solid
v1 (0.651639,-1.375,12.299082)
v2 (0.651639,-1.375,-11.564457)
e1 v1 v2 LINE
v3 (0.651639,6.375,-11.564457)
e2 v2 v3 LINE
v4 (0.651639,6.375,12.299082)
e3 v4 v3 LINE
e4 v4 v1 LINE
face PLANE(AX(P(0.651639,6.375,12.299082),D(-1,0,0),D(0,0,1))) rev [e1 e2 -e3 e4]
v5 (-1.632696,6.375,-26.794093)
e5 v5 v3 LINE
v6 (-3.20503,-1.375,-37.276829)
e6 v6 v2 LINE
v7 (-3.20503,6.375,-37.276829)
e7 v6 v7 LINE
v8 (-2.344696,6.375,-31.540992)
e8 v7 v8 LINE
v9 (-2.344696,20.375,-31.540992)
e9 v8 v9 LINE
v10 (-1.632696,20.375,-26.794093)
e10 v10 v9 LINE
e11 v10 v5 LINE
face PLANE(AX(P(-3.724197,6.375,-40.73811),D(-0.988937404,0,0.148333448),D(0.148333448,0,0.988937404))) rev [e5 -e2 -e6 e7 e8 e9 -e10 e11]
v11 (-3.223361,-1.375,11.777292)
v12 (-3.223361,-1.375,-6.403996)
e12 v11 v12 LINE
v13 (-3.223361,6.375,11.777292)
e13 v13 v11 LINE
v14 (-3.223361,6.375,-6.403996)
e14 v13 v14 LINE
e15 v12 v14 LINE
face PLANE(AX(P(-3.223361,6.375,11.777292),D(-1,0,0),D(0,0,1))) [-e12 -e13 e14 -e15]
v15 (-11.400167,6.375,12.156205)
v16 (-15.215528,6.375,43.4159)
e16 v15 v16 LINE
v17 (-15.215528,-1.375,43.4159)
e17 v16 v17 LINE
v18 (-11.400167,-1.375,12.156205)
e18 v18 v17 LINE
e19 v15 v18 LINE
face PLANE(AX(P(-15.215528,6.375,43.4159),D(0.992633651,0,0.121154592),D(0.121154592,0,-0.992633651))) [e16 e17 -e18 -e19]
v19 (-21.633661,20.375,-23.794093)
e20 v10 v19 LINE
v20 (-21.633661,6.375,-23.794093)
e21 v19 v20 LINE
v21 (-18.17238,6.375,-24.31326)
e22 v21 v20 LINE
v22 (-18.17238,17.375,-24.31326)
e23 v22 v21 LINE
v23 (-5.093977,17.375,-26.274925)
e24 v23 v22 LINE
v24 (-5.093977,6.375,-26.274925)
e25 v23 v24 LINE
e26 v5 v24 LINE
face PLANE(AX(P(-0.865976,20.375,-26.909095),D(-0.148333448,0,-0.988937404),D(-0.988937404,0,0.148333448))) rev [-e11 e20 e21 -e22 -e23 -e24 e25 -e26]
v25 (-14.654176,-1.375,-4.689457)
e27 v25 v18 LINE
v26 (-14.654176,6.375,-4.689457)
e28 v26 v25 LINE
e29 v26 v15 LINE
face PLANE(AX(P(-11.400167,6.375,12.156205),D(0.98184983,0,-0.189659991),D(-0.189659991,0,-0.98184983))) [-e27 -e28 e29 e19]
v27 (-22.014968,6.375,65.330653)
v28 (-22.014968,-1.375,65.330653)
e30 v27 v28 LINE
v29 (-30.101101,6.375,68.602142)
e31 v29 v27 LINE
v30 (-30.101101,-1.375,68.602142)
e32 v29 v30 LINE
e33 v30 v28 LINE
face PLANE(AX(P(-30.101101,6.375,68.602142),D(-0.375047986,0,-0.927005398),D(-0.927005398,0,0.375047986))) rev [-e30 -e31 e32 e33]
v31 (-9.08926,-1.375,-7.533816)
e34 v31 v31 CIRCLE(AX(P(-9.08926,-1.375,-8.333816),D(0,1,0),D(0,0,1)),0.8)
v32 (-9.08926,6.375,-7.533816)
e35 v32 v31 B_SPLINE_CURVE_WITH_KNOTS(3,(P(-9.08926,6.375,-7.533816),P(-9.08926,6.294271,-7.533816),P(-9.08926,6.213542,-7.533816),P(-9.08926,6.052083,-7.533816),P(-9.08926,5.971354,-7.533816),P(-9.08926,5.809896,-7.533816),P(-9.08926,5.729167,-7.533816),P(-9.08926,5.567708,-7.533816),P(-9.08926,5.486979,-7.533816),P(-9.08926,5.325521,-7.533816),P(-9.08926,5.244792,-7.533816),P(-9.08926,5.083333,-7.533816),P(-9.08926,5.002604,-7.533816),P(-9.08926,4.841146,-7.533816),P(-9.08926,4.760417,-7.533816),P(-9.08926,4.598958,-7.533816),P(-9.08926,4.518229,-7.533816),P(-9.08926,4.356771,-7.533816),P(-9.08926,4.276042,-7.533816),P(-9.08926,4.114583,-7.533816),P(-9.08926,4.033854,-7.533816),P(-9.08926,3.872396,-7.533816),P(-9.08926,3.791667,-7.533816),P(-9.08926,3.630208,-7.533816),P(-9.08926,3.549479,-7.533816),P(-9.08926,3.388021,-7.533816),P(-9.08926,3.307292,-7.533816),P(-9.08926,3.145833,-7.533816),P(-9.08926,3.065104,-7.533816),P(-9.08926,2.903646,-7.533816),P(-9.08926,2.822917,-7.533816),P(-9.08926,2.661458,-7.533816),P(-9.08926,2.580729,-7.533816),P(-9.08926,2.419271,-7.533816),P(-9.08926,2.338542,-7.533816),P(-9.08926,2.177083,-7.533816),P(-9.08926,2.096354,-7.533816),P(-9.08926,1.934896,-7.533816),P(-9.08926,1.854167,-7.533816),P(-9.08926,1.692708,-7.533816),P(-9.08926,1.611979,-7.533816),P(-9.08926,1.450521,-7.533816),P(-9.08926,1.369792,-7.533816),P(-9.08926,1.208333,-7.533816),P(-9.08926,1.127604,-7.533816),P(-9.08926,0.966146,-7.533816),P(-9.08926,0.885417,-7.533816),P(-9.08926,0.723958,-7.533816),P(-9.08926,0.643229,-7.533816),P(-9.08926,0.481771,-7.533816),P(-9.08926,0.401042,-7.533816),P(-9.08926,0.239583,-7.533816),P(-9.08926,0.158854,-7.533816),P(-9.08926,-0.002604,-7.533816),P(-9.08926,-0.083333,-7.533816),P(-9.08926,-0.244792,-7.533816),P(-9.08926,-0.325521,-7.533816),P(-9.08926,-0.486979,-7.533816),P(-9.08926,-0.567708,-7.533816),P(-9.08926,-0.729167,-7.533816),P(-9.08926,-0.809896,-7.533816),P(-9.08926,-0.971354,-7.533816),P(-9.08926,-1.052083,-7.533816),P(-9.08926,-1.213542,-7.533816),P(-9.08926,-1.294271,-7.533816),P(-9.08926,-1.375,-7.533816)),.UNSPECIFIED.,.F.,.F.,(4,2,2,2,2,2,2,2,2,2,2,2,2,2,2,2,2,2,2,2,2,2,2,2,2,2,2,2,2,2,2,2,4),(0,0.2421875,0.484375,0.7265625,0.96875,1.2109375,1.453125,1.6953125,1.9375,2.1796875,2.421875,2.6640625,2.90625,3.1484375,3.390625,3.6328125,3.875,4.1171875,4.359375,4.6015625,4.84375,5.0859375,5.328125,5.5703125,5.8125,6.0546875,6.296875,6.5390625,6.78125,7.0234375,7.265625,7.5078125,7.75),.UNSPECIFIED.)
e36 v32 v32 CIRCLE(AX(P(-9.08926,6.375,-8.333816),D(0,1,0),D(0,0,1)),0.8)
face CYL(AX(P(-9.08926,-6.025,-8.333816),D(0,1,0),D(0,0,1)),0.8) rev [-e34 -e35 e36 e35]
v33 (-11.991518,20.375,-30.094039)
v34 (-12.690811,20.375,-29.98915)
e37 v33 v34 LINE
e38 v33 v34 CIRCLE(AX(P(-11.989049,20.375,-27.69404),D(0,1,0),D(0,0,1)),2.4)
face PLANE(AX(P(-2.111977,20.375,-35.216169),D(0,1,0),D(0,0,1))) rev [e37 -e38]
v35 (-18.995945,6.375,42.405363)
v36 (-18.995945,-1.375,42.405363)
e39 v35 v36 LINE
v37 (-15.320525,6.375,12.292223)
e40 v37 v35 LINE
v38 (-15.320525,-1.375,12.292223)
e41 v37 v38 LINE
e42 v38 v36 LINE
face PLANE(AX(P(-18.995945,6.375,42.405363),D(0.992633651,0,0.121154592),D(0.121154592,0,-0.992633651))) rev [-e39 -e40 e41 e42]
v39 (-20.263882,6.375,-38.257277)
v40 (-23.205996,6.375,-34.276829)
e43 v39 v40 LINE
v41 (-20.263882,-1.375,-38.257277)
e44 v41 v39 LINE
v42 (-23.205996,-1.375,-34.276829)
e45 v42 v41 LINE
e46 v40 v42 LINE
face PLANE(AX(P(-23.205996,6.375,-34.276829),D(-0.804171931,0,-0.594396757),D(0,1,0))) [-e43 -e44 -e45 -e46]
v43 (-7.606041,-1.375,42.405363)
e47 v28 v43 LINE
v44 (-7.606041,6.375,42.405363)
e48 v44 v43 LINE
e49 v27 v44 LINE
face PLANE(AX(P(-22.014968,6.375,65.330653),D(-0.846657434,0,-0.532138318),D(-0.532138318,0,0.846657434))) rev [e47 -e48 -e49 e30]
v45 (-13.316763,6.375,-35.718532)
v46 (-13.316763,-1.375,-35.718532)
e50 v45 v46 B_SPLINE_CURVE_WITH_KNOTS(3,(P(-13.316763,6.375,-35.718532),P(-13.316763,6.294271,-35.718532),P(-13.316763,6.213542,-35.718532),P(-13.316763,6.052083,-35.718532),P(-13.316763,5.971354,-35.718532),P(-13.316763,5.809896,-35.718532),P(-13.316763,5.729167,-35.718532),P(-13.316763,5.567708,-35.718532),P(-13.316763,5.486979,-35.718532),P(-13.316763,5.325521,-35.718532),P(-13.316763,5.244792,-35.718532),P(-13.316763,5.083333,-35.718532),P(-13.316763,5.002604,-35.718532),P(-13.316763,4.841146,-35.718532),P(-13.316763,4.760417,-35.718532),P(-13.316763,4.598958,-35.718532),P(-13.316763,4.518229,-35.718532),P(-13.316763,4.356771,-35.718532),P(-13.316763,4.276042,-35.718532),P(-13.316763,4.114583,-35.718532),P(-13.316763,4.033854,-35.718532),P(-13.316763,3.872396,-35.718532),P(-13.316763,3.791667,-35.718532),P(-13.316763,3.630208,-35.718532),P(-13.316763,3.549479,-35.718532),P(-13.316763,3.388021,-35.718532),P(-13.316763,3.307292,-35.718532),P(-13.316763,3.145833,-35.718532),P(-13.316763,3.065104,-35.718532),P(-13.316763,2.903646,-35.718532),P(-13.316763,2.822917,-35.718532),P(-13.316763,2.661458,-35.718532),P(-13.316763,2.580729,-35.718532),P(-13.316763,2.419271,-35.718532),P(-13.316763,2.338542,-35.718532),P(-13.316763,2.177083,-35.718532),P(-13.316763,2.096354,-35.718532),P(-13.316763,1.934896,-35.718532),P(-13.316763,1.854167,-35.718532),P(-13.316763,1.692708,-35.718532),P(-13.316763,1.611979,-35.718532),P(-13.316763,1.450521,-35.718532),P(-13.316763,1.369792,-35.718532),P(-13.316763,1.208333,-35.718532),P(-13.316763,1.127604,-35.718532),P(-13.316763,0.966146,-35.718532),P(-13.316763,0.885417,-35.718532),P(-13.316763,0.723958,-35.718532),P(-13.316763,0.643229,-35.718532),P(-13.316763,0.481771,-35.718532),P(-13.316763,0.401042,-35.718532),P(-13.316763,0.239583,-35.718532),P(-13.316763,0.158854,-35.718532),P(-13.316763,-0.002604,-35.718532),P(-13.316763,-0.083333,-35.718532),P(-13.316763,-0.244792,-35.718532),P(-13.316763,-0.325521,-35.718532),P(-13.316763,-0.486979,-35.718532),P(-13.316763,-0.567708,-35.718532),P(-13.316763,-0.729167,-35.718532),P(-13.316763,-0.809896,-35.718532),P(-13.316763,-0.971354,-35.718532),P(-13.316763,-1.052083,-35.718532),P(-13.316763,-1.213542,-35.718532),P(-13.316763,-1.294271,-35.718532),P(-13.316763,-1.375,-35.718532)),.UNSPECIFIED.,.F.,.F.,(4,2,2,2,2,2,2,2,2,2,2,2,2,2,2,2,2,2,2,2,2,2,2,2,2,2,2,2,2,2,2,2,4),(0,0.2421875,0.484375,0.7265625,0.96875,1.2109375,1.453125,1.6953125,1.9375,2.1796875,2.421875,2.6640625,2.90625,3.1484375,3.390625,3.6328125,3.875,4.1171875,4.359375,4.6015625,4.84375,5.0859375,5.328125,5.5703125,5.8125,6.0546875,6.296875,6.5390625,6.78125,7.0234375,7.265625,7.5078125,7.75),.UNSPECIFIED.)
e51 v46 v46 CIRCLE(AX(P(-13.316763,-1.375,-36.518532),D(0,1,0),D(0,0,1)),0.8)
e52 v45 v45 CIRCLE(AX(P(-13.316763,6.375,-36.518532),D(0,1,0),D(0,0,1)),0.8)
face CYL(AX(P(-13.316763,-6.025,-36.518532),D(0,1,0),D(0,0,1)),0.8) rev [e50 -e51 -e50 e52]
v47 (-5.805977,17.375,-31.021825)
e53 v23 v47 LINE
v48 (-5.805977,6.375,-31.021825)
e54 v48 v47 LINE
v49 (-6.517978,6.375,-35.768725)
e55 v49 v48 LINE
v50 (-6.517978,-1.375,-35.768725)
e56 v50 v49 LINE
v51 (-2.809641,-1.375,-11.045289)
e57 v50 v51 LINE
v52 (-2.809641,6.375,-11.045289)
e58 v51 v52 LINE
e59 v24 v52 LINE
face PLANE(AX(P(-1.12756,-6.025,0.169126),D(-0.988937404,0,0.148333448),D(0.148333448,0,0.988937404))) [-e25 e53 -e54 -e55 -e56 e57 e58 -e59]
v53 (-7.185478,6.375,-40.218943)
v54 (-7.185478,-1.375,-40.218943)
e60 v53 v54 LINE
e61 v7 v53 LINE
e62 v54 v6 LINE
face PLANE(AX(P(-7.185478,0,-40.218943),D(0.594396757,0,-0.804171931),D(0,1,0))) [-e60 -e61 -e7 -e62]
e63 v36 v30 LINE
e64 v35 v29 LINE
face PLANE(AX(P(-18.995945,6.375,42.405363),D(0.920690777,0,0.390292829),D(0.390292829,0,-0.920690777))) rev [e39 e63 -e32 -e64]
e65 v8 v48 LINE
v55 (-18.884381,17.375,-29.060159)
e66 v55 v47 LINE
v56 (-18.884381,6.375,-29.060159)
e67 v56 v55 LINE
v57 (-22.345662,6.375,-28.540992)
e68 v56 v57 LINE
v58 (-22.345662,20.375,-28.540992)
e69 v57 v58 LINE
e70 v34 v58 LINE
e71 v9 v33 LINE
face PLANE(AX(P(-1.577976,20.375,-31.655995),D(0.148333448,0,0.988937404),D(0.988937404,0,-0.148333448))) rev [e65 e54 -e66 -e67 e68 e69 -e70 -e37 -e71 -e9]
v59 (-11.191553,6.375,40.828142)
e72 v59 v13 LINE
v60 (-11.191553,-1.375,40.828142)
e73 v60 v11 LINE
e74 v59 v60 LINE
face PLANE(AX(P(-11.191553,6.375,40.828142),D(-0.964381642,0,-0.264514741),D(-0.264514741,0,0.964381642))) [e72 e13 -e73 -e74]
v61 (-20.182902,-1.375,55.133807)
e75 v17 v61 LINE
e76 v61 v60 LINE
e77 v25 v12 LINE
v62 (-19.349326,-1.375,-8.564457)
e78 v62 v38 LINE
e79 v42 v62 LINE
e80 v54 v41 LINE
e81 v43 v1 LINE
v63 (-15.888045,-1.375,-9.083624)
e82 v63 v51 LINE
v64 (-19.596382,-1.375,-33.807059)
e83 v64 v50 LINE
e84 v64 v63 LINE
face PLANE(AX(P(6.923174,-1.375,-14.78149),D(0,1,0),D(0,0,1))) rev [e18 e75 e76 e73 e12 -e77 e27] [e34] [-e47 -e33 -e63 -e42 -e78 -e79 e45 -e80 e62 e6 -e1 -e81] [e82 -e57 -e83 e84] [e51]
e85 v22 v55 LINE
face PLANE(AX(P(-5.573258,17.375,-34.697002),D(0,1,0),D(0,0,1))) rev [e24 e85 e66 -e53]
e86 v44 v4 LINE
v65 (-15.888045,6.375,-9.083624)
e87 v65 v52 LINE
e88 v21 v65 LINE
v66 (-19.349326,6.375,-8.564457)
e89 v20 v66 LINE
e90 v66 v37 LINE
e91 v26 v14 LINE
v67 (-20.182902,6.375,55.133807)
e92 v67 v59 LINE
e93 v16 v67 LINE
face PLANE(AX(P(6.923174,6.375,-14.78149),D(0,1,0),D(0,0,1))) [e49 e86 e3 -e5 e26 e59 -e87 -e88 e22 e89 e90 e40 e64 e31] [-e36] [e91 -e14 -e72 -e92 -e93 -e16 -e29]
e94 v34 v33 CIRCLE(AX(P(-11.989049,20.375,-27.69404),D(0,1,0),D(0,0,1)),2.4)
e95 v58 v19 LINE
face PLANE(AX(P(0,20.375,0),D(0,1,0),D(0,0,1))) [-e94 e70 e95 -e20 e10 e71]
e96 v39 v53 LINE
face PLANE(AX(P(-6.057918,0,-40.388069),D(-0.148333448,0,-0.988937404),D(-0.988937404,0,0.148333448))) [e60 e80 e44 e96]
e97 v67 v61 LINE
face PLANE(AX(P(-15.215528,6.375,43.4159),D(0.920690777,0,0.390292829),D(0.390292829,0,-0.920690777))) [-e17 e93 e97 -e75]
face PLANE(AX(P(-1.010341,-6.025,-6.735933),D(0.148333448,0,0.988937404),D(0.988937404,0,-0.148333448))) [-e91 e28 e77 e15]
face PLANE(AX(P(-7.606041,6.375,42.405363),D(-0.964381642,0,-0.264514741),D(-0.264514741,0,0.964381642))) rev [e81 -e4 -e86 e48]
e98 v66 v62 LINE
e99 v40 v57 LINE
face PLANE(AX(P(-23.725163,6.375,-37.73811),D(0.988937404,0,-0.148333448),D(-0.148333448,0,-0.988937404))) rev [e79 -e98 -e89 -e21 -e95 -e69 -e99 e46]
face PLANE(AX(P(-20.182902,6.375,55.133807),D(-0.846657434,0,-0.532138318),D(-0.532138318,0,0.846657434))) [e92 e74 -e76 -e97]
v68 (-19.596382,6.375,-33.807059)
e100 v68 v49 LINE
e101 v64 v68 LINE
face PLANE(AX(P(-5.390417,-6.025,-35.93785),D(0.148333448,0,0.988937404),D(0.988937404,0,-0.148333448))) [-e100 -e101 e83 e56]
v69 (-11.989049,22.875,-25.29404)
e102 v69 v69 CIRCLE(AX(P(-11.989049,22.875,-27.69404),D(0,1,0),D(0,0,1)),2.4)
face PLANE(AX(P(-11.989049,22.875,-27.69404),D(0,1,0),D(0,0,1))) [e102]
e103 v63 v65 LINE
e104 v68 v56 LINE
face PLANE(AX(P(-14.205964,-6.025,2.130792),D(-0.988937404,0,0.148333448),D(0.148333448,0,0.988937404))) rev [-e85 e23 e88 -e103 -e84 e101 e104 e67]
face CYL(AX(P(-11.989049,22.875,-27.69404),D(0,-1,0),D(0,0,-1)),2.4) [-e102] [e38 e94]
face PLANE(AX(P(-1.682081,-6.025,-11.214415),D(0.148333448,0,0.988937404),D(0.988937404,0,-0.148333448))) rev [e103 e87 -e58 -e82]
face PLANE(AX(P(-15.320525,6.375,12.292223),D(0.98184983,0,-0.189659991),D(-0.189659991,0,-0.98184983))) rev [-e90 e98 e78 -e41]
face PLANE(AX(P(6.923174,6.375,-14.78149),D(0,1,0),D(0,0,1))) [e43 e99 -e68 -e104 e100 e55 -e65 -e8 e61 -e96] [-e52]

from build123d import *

# Parameters (mm, degrees)
BOSS_EXTRUDE1_DEPTH = 5
SCALE2_SCALE        = 1.55
CUT_EXTRUDE1_DEPTH  = 12.4
BOSS_EXTRUDE3_DEPTH = 7.75
SKETCH9_W           = 20.224703408
SKETCH9_H           = 7.75
BOSS_EXTRUDE4_DEPTH = 29.5
CUT_EXTRUDE2_DEPTH  = 12.4
CHAMFER1_SIZE       = 3.5
CHAMFER2_SIZE       = 3.5
SKETCH11_R          = 0.8
CUT_EXTRUDE3_DEPTH  = 12.4
SKETCH12_R          = 0.8
CUT_EXTRUDE4_DEPTH  = 12.4
BOSS_EXTRUDE5_DEPTH = 14
SKETCH18_W          = 12
SKETCH18_H          = 3
BOSS_EXTRUDE6_DEPTH = 14
SKETCH19_R          = 2.4
BOSS_EXTRUDE7_DEPTH = 2.5
SKETCH22_W          = 3.6
SKETCH22_H          = 14
CUT_EXTRUDE5_DEPTH  = 21


with BuildPart() as part:
    # Sketch2 → Boss-Extrude1 (new body)
    with BuildSketch(Plane(origin=(0, 0, 0), x_dir=(1, 0, 0), z_dir=(0, 1, 0))):
        Polygon((-16.722011876, -36.89474357), (-23.886628792, -53.795891167), (-18.669768773, -51.685253144), (-9.373686833, -36.89474357), (-4.046151178, -17.471336145), (-4.046151178, -4.010989005), (-16.95, -4.010989005), (-14.350773449, -17.46691156), align=None)
        Polygon((-13.920870812, -6.510989005), (-6.546151178, -6.510989005), (-6.546151178, -17.13469746), (-11.686920269, -35.877181599), (-17.487790608, -45.106642876), (-14.283033348, -37.546702673), (-11.821510253, -17.379157883), align=None, mode=Mode.SUBTRACT)
    extrude(amount=BOSS_EXTRUDE1_DEPTH)


with BuildPart() as part_1:
    # Scale2: scaled about (-12.587588719, 2.5, 26.875435477)
    add(part.part.scale(SCALE2_SCALE).moved(Location((6.923173795, -1.375, -14.781489512))))

    # Sketch6 → Cut-Extrude1 (cut)
    with BuildSketch(Plane(origin=(0, 6.375, 0), x_dir=(1, 0, 0), z_dir=(0, 1, 0))):
        Polygon((-3.22336053, 6.403996086), (-14.654175964, 4.689456555), (-3.22336053, 4.689456555), align=None)
    extrude(amount=-CUT_EXTRUDE1_DEPTH, mode=Mode.SUBTRACT)

    # Sketch7 → Boss-Extrude3 (add)
    with BuildSketch(Plane(origin=(0, 6.375, 0), x_dir=(1, 0, 0), z_dir=(0, 1, 0))):
        Polygon((-19.349326204, 8.564456555), (0.65163947, 8.564456555), (0.65163947, 11.564456555), align=None)
    extrude(amount=-BOSS_EXTRUDE3_DEPTH)

    # Sketch9 → Boss-Extrude4 (add)
    with BuildSketch(Plane(origin=(-1.682081089, 0, -11.214415372), x_dir=(-0.9889374035171397, 0, 0.1483334484355372), z_dir=(-0.14833344843553717, 0, -0.9889374035171395))):
        with Locations((7.752525338, 2.5)):
            Rectangle(SKETCH9_W, SKETCH9_H)
    extrude(amount=BOSS_EXTRUDE4_DEPTH)

    # Sketch10 → Cut-Extrude2 (cut)
    with BuildSketch(Plane(origin=(0, 6.375, 0), x_dir=(1, 0, 0), z_dir=(0, 1, 0))):
        Polygon((-6.517977653, 35.768724573), (-19.596381503, 33.807058712), (-15.888045292, 9.083623624), (-2.809641442, 11.045289485), align=None)
    extrude(amount=-CUT_EXTRUDE2_DEPTH, mode=Mode.SUBTRACT)

    # Chamfer1
    chamfer1_edges = [part_1.edges().sort_by_distance(p)[0] for p in [
        (-23.725162933, 2.5, -37.738109959),
    ]]
    chamfer(chamfer1_edges, length=CHAMFER1_SIZE)

    # Chamfer2
    chamfer2_edges = [part_1.edges().sort_by_distance(p)[0] for p in [
        (-3.724197259, 2.5, -40.738109959),
    ]]
    chamfer(chamfer2_edges, length=CHAMFER2_SIZE)

    # Sketch11 → Cut-Extrude3 (cut)
    with BuildSketch(Plane(origin=(0, 6.375, 0), x_dir=(1, 0, 0), z_dir=(0, 1, 0))):
        with Locations((-13.316763113, 36.518532099)):
            Circle(SKETCH11_R)
    extrude(amount=-CUT_EXTRUDE3_DEPTH, mode=Mode.SUBTRACT)

    # Sketch12 → Cut-Extrude4 (cut)
    with BuildSketch(Plane(origin=(0, 6.375, 0), x_dir=(1, 0, 0), z_dir=(0, 1, 0))):
        with Locations((-9.089259832, 8.333816099)):
            Circle(SKETCH12_R)
    extrude(amount=-CUT_EXTRUDE4_DEPTH, mode=Mode.SUBTRACT)

    # Sketch17 → Boss-Extrude5 (add)
    with BuildSketch(Plane(origin=(0, 6.375, 0), x_dir=(1, 0, 0), z_dir=(0, 1, 0))):
        Polygon((-17.638379984, 20.753084986), (-19.418381365, 32.620333828), (-22.879662277, 32.101166759), (-21.099660896, 20.233917916), align=None)
        Polygon((-2.878696603, 35.101166759), (-6.339977515, 34.581999689), (-4.559976134, 22.714750847), (-1.098695221, 23.233917916), align=None)
    extrude(amount=BOSS_EXTRUDE5_DEPTH)

    # Sketch18 → Boss-Extrude6 (add)
    with BuildSketch(Plane(origin=(-14.205964203, 0, 2.130791748), x_dir=(-0.1483334484355373, 0, -0.9889374035171397), z_dir=(0.9889374035171395, 0, -0.14833344843553728))):
        with Locations((29.139863709, 18.875)):
            Rectangle(SKETCH18_W, SKETCH18_H)
    extrude(amount=BOSS_EXTRUDE6_DEPTH)

    # Sketch19 → Boss-Extrude7 (add)
    with BuildSketch(Plane(origin=(0, 20.375, 0), x_dir=(1, 0, 0), z_dir=(0, 1, 0))):
        with Locations((-11.989048632, 27.694039925)):
            Circle(SKETCH19_R)
    extrude(amount=BOSS_EXTRUDE7_DEPTH)

    # Sketch22 → Cut-Extrude5 (cut)
    with BuildSketch(Plane(origin=(-17.667245116, 0, 2.649958817), x_dir=(0.1483334484355372, 0, 0.9889374035171397), z_dir=(-0.9889374035171395, 0, 0.14833344843553717))):
        with Locations((-24.939863709, 13.375)):
            Rectangle(SKETCH22_W, SKETCH22_H)
        with Locations((-33.339863709, 13.375)):
            Rectangle(SKETCH22_W, SKETCH22_H)
    extrude(amount=-CUT_EXTRUDE5_DEPTH, mode=Mode.SUBTRACT)


solid = part_1.part
